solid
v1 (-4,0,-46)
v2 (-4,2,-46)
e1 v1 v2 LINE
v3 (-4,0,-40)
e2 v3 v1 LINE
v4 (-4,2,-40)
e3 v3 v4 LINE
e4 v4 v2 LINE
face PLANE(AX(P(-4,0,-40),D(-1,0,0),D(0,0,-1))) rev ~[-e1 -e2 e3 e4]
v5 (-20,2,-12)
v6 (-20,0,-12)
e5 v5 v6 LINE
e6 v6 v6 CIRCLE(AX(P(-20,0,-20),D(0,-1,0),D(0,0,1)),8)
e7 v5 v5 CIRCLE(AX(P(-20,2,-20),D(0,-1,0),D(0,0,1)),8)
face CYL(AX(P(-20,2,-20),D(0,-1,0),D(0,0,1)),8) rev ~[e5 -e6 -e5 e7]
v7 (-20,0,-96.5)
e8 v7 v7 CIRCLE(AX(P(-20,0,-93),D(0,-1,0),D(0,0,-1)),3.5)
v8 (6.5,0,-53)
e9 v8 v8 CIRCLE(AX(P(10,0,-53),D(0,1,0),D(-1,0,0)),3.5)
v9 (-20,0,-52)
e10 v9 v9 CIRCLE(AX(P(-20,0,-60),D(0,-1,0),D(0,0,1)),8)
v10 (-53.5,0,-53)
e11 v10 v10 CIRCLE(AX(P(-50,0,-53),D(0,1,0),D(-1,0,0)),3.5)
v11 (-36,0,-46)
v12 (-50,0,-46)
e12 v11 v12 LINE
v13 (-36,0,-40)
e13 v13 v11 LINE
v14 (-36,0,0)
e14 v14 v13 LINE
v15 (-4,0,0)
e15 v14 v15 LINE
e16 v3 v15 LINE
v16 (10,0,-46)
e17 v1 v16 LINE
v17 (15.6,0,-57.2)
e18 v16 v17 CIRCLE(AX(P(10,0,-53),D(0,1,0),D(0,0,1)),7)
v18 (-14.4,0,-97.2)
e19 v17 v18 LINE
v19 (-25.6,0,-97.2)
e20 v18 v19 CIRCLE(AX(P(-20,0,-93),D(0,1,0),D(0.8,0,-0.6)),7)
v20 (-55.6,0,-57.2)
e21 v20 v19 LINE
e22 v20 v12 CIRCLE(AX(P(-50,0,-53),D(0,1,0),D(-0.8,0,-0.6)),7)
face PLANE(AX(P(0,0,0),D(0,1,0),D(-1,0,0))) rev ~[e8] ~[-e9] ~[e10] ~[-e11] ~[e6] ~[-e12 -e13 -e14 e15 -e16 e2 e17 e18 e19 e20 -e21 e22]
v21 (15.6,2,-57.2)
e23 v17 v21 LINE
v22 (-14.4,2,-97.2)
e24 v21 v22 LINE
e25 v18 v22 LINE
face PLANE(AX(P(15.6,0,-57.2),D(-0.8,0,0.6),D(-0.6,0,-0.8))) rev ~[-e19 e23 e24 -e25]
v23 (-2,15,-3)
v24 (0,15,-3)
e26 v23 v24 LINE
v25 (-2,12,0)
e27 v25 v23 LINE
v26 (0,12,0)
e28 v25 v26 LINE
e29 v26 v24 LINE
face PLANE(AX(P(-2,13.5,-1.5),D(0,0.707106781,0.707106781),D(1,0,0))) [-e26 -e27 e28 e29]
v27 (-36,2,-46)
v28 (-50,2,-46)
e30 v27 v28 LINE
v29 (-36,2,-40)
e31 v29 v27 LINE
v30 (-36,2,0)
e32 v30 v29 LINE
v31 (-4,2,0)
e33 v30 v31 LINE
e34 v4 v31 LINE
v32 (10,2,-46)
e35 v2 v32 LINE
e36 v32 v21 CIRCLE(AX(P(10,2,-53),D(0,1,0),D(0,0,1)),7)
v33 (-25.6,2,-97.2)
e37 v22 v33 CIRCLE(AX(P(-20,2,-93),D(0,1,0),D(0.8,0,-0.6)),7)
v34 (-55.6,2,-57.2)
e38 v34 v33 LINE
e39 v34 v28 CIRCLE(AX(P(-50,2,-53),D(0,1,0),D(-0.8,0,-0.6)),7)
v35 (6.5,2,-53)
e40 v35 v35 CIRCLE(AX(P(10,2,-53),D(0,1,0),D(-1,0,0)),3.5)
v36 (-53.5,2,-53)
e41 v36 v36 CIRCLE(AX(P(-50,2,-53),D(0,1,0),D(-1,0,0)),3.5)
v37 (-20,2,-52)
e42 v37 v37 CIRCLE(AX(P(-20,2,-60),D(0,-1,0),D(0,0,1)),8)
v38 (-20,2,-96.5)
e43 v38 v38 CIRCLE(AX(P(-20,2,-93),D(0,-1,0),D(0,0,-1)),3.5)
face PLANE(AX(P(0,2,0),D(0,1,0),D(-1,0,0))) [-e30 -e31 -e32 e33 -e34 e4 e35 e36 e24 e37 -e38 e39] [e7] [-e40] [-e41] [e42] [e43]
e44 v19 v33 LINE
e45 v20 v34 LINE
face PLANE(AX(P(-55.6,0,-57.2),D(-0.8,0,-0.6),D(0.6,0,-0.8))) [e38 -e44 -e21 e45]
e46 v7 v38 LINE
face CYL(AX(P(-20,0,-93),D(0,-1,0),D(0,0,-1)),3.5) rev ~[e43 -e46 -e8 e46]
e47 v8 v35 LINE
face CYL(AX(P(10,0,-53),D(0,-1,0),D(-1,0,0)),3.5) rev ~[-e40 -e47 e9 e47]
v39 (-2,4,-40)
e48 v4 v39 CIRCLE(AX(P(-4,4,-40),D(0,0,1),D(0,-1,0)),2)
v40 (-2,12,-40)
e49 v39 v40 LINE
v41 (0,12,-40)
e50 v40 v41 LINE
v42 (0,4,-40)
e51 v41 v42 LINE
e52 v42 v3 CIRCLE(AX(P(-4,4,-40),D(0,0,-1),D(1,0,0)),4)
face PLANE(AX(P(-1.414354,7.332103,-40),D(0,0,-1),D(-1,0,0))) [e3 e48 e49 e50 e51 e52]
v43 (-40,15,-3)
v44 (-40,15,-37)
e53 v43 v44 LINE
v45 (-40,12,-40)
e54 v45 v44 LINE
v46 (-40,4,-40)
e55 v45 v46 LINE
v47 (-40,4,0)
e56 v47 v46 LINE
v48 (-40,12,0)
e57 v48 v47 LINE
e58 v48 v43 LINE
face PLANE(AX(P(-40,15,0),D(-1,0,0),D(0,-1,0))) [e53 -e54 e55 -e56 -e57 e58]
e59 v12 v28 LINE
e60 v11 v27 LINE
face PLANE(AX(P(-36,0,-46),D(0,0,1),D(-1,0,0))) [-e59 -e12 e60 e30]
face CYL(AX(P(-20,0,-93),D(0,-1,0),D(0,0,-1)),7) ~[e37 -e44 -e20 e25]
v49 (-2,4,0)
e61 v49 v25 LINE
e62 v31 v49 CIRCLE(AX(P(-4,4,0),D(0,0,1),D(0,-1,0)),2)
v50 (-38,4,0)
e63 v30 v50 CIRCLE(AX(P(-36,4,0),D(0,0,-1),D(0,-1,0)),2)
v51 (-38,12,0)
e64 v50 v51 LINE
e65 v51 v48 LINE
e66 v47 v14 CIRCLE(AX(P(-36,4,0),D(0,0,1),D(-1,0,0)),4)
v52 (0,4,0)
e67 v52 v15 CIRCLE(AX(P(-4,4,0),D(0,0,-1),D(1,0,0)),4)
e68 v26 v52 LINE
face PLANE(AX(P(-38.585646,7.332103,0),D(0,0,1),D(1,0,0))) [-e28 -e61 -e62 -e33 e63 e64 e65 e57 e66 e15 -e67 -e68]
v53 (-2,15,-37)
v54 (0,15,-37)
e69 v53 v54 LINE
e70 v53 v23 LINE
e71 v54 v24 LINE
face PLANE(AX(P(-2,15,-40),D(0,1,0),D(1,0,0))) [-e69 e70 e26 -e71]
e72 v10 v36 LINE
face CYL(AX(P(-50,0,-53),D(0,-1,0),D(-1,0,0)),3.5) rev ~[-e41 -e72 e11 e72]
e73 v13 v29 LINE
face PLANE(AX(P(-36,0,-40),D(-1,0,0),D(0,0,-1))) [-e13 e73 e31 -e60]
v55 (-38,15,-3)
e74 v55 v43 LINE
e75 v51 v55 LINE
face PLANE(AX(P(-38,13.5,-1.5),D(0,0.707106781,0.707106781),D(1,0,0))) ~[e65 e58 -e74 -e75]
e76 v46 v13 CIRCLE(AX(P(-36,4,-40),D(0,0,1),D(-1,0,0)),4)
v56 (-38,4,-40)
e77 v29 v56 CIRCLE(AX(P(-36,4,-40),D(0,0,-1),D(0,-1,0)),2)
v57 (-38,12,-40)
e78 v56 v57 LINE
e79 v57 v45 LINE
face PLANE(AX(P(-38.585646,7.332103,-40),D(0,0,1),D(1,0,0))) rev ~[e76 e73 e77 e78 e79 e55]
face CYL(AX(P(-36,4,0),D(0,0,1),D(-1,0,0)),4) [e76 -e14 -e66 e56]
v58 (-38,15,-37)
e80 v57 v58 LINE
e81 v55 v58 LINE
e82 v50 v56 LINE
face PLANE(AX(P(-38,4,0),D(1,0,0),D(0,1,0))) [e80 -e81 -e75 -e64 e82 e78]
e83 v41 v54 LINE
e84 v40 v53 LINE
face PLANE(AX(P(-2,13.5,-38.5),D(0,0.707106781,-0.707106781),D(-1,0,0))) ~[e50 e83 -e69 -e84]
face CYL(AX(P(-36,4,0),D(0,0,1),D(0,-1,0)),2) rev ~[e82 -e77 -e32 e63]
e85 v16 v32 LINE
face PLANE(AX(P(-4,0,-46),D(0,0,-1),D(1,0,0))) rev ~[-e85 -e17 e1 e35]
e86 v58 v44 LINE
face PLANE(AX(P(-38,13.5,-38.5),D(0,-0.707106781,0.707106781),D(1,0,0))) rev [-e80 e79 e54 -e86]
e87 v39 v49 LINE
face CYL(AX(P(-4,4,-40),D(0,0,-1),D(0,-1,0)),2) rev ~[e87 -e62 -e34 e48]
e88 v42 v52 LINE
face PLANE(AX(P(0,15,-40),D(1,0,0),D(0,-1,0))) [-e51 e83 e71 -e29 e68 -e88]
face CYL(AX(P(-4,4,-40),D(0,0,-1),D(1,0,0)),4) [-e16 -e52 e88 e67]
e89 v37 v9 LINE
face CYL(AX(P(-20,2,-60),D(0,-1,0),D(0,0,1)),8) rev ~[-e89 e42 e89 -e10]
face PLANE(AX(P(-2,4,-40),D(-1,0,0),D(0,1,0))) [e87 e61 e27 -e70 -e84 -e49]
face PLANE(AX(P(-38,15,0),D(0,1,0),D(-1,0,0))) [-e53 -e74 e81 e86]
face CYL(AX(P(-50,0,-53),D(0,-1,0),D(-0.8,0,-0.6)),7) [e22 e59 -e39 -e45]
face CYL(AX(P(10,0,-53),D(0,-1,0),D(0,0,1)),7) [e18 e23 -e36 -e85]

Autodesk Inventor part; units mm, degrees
ref_plane "YZ Plane" through (0, 0, 0) normal (1, 0, 0) x (0, 1, 0)
ref_plane "XZ Plane" through (0, 0, 0) normal (0, 1, 0) x (-1, 0, 0)
ref_plane "XY Plane" through (0, 0, 0) normal (0, 0, 1) x (1, 0, 0)
sketch "Náčrt1" plane through (0, 0, 0) normal (0, 1, 0) x (-1, 0, 0)
  line L0 (20, 0) -> (40, 0)
  line L1 (40, 0) -> (40, -40)
  line L2 (40, -40) -> (36, -40)
  line L3 (36, -40) -> (36, -46)
  circle A0 centre (50, -53) radius 3.5
  arc A1 (55.6, -57.2) -> (50, -46) centre (50, -53) ccw
  line L4 (36, -46) -> (50, -46)
  arc A2 (20, -96.5) -> (20, -89.5) centre (20, -93) ccw
  arc A3 (20, -100) -> (25.6, -97.2) centre (20, -93) ccw
  line L5 (55.6, -57.2) -> (25.6, -97.2)
  line L6 (20, 0) -> (0, 0)
  line L7 (0, 0) -> (0, -40)
  line L8 (0, -40) -> (4, -40)
  line L9 (4, -40) -> (4, -46)
  circle A4 centre (-10, -53) radius 3.5
  arc A5 (-10, -46) -> (-15.6, -57.2) centre (-10, -53) ccw
  line L10 (4, -46) -> (-10, -46)
  arc A6 (20, -89.5) -> (20, -96.5) centre (20, -93) ccw
  arc A7 (14.4, -97.2) -> (20, -100) centre (20, -93) ccw
  line L11 (-15.6, -57.2) -> (14.4, -97.2)
  dimension "d0" = 40
  dimension "d1" = 40
  dimension "d2" = 4
  dimension "d3" = 6
  dimension "d8" = 7
  dimension "d9" = 14
  dimension "d11" = 7
  dimension "d12" = 14
  dimension "d13" = 60
extrude "Deska1" add sketch "Náčrt1" along normal blind 2
sketch "Náčrt2" plane through (-38, 0, 0) normal (-1, 0, 0) x (0, -1, 0)
  line L0 (0, -40) -> (0, 0)
  line L1 (0, 0) -> (-15, 0)
  line L2 (-15, 0) -> (-15, -40)
  line L3 (-15, -40) -> (0, -40)
edge flange "Obruba1" height 15 angle 90 thickness 2 bend radius 2 thickness toward (-1, 0, 0) relief tear relief width 2 relief depth 1 corner gap 2 corner form 0 edges at (-40, 2, -20) (0, 2, -20) wall of the first edge with corners at (-38, 0, -40) (-38, 0, 0) (-38, 15, 0) (-38, 15, -40)
bend "Ohyb1"
corner "Roh1"
chamfer "Zkosení rohu1" distance 3 angle 45 4 edges at (-39, 15, -40) (-39, 15, 0) (-1, 15, -40) (-1, 15, 0)
sketch "Náčrt3" plane through (0, 2, 0) normal (0, 1, 0) x (1, 0, 0)
  line L0 (-4, 0) -> (-36, 0) construction
  line L1 (-40, 40) -> (-40, 0) construction
  point P0 (0, 0)
  point P1 (-20, 20)
  dimension "d28" = 20
  dimension "d29" = 20
hole "Díra1" at (-20, 2, -20) direction (0, -1, 0) diameter 16 depth 2 tip angle 118
sketch "Náčrt5" plane through (0, 2, 0) normal (0, 1, 0) x (1, 0, 0)
  line L0 (-4, 0) -> (-36, 0) construction
  line L1 (-40, 37) -> (-40, 3) construction
  point P0 (0, 0)
  point P1 (-20, 60)
  dimension "d46" = 60
  dimension "d47" = 20
hole "Díra3" at (-20, 2, -60) direction (0, -1, 0) diameter 16 depth 2 tip angle 118
equation "\"d35\" = Tloušťka"
equation "\"d53\" = Tloušťka"
equation "\"d14\" = Tloušťka"
equation "\"d15\" = ŠířkaVýštipu"
equation "\"d16\" = HloubkaVýštipu"
equation "\"d17\" = MinimálníZbytek"
equation "\"d18\" = PřechodovýPoloměr"
equation "\"d21\" = PoloměrOhybu"
equation "\"d22\" = VelikostRohovéhoVýštipu"
equation "\"d23\" = VelikostMezery"
equation "\"d24\" = VelikostJacobihoPoloměru"
equation "\"PoloměrOhybu\" = Tloušťka"
equation "\"ŠířkaVýštipu\" = Tloušťka"
equation "\"HloubkaVýštipu\" = 0.5 * Tloušťka"
equation "\"VelikostRohovéhoVýštipu\" = 4 * Tloušťka"
equation "\"MinimálníZbytek\" = 2 * Tloušťka"
equation "\"PřechodovýPoloměr\" = PoloměrOhybu"
equation "\"VelikostJacobihoPoloměru\" = PoloměrOhybu"
equation "\"VelikostMezery\" = Tloušťka"
equation "\"Tloušťka\" = 2"
properties part number "26886-Vodička_Vojtěch_příklad-4"
